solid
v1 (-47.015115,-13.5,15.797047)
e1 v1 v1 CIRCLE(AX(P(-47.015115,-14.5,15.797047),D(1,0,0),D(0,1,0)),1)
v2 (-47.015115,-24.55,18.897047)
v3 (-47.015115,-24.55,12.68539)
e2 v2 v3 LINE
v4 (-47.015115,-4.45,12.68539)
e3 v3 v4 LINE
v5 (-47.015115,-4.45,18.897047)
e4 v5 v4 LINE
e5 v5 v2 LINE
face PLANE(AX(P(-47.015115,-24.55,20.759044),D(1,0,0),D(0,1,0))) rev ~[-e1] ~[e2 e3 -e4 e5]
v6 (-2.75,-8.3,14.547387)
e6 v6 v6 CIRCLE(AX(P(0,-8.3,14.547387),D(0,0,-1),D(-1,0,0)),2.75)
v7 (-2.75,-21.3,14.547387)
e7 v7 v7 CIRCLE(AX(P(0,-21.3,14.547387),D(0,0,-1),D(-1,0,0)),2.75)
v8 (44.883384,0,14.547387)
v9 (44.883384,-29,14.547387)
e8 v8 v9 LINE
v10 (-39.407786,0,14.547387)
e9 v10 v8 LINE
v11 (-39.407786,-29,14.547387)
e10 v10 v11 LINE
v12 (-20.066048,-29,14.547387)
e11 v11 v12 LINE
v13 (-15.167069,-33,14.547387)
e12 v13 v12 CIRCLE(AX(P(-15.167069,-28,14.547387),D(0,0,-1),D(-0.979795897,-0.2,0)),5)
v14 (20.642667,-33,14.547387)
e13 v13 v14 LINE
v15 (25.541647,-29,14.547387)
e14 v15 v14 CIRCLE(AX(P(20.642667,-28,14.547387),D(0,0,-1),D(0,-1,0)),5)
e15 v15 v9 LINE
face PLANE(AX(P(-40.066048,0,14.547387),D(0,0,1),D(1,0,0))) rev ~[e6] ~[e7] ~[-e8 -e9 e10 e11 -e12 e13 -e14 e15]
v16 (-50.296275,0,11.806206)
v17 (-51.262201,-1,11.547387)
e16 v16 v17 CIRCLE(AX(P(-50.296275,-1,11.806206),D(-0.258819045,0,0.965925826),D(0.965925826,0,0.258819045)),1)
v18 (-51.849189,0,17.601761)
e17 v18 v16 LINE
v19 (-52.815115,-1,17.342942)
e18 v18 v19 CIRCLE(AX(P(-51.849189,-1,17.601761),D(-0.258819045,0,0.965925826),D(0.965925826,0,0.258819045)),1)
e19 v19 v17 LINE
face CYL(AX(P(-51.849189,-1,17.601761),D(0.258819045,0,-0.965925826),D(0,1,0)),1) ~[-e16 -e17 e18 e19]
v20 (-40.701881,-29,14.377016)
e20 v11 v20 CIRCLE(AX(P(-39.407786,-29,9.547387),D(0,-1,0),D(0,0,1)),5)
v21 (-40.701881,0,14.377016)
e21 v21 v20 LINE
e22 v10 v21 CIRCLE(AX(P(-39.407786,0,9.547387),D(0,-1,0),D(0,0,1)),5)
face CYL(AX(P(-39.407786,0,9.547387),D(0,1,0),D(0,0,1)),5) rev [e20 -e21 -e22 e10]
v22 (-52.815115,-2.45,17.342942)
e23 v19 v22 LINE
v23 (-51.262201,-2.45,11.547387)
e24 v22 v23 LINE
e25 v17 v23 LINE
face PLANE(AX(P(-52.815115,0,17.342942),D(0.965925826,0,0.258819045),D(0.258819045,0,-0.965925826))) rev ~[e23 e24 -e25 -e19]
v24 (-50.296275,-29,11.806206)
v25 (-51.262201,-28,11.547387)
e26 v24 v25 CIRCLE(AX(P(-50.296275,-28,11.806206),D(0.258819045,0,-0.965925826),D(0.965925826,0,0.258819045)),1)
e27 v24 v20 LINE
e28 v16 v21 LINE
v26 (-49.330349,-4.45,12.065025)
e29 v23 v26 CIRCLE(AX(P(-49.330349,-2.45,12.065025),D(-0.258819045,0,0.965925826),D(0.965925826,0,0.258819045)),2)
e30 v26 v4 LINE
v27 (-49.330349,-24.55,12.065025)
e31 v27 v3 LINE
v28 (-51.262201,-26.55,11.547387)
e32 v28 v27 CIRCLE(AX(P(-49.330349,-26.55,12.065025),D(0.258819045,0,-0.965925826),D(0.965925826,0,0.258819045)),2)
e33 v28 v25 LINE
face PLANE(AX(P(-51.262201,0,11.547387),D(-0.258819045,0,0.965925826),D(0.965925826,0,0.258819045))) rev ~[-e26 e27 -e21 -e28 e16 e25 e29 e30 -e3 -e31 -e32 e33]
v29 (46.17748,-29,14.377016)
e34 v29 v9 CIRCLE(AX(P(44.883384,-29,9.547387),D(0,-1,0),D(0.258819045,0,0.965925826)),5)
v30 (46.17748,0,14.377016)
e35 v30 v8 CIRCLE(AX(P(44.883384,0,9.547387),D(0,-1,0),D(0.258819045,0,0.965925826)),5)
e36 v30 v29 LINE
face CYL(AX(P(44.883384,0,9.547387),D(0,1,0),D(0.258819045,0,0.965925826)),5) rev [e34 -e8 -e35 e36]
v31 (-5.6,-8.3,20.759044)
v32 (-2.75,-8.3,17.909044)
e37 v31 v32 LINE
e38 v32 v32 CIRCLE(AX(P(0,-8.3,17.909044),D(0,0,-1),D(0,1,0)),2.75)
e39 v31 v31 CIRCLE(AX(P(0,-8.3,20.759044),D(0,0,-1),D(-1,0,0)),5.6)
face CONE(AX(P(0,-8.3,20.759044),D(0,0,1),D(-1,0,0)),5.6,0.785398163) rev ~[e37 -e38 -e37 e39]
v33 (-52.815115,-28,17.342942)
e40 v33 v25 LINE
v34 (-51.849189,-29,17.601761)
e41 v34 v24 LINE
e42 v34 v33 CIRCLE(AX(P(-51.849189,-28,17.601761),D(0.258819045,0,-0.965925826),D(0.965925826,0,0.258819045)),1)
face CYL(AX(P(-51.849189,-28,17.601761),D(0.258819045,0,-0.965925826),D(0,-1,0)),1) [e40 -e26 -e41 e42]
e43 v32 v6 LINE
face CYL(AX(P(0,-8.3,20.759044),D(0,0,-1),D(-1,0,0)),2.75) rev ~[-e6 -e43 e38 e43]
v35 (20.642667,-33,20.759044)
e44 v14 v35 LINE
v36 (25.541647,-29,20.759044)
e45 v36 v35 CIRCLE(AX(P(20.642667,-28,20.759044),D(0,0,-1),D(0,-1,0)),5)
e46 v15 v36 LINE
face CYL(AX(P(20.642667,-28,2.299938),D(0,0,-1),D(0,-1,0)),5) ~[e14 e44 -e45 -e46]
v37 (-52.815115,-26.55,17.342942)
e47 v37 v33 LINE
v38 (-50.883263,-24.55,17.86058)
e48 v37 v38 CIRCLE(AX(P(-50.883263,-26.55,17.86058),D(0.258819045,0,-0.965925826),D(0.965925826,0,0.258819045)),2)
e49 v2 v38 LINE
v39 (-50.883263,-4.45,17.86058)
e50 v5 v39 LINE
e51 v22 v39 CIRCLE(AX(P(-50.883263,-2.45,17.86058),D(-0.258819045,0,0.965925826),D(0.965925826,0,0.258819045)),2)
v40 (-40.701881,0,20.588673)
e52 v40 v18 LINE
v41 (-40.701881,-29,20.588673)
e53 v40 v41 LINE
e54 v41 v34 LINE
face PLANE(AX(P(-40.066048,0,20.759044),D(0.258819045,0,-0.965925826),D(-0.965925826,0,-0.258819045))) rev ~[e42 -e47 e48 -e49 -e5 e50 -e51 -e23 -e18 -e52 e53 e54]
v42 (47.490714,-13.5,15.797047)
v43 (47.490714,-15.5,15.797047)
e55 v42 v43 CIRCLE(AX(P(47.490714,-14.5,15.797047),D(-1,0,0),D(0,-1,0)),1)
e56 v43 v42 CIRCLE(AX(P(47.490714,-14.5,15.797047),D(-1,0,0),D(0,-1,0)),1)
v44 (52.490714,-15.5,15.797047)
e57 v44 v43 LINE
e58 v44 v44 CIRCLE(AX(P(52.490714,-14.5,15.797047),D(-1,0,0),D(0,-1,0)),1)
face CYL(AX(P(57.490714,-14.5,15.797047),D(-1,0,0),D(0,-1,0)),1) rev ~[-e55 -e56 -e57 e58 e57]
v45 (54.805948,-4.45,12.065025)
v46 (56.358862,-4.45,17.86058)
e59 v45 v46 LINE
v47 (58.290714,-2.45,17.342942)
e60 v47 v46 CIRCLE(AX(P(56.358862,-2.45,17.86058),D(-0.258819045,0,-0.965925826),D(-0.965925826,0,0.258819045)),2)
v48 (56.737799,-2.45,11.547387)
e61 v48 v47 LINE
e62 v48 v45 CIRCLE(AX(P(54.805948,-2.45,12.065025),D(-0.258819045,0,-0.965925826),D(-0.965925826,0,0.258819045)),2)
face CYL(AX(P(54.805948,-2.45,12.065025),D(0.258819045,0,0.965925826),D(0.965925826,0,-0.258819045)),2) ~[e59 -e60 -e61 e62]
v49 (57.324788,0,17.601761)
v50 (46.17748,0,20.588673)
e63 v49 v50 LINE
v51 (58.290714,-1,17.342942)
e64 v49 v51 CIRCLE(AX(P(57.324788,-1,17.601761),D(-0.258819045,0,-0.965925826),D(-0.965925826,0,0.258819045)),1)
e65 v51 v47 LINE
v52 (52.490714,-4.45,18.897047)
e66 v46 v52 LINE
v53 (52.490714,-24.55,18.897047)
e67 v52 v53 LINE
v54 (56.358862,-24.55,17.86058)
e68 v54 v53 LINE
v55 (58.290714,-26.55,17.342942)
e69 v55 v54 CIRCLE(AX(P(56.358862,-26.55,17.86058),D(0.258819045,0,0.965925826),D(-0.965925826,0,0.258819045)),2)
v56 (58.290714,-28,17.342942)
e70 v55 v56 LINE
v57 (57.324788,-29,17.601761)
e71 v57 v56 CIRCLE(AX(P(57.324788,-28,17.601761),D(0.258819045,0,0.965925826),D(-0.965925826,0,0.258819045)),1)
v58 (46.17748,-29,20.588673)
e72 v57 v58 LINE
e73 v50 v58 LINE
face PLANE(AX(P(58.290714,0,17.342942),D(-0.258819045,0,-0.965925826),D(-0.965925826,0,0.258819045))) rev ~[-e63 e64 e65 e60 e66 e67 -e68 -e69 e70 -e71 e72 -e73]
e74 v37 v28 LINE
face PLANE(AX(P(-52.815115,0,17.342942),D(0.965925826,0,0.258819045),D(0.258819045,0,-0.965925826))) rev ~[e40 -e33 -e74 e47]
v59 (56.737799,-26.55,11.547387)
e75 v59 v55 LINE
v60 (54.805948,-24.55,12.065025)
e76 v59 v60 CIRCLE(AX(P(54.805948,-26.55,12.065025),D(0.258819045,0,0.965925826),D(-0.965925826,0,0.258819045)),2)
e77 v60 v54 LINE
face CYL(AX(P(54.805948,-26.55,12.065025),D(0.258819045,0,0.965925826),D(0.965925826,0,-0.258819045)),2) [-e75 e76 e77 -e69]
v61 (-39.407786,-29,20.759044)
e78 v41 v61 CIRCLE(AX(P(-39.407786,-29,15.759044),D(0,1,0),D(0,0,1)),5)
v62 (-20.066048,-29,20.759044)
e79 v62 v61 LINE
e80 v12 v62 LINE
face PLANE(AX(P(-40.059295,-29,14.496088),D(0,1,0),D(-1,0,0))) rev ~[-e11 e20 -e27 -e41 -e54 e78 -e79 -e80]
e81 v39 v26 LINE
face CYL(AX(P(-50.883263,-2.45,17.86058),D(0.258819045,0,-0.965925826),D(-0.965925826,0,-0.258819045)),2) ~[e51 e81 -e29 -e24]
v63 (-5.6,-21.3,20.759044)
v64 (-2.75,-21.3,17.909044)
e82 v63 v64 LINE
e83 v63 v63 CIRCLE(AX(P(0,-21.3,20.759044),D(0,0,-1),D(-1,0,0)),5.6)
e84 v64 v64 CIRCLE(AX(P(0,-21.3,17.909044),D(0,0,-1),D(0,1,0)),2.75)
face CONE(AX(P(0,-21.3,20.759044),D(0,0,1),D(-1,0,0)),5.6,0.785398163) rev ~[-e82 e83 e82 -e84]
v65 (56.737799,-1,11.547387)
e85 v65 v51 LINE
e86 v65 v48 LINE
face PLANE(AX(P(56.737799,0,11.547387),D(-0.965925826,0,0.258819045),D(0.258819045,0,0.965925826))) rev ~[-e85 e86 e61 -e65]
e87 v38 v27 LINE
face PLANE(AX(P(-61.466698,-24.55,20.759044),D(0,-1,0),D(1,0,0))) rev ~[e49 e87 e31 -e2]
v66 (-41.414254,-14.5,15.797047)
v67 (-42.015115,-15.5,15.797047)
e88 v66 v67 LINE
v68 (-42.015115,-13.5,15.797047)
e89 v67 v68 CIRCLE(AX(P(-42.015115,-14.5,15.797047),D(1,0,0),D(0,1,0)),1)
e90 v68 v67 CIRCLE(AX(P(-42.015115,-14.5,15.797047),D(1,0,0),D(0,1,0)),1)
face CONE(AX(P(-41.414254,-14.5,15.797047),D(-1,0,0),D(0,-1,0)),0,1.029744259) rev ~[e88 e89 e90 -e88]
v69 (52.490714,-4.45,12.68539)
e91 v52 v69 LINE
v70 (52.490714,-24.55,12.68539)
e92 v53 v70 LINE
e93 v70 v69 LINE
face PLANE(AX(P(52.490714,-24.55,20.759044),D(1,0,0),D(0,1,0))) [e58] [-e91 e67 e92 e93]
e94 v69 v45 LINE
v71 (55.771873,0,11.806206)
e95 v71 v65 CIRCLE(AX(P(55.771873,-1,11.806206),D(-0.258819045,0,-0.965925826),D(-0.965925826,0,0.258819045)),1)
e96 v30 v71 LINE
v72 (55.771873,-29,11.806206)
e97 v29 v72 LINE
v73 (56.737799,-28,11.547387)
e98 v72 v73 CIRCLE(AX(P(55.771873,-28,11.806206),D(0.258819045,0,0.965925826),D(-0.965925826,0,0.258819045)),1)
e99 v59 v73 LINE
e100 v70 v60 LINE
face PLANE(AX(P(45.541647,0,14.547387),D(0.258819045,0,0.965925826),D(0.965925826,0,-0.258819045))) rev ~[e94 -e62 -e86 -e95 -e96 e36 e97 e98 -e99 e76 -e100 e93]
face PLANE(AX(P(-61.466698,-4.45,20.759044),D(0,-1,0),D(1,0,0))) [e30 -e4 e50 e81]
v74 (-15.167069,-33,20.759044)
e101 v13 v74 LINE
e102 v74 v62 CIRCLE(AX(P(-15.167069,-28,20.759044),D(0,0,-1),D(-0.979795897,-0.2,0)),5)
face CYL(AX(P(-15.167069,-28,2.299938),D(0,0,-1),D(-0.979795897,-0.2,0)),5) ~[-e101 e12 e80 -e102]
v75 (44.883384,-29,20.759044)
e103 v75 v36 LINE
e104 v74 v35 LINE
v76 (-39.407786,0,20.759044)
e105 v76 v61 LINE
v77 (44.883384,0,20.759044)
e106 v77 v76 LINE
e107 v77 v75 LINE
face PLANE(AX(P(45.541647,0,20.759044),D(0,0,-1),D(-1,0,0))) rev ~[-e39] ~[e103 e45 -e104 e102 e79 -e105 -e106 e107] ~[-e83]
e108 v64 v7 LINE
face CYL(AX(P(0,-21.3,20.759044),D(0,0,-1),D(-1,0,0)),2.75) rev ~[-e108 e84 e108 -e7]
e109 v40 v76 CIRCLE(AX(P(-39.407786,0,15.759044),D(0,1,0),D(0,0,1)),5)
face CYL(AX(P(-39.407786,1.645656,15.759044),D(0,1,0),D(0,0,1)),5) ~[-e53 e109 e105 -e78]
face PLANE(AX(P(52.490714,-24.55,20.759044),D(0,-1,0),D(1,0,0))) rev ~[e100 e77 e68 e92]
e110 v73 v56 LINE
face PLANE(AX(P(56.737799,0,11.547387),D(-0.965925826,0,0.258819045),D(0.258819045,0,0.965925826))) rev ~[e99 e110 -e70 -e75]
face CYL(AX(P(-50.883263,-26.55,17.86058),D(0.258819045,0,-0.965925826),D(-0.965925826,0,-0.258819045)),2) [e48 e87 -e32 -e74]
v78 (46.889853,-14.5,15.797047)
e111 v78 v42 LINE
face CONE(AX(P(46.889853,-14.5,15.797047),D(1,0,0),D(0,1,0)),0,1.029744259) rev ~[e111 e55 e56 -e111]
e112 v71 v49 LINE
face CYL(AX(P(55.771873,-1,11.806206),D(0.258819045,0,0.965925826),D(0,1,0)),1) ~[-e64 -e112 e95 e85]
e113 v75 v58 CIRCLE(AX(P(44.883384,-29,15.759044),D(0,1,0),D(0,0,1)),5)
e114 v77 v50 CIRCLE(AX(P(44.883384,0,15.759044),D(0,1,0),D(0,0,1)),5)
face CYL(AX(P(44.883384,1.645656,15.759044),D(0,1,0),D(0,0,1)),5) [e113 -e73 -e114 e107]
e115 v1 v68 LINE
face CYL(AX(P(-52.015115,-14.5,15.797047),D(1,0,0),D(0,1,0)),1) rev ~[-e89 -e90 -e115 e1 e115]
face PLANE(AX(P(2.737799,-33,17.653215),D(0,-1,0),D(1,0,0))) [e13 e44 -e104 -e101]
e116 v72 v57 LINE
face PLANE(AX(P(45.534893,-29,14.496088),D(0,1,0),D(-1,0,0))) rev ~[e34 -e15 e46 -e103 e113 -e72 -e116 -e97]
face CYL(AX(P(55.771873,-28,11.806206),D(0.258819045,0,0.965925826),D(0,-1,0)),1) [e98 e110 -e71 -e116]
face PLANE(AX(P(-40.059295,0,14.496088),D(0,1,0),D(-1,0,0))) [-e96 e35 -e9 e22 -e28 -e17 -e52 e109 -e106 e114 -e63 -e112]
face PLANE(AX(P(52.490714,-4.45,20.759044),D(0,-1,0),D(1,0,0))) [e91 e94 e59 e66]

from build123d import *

# Parameters (mm, degrees)
F1_DEPTH        = 29
F2_W            = 45.6076951546
F2_H            = 6.2116570825
F3_DEPTH        = 4
F4_W            = 14.4515829202
F4_H            = 20.1
F4_W_2          = 11.8
F5_DEPTH        = 25
F7_D            = 2
F7_DEPTH        = 5
F7_TIP          = 0.600860619
F8_T1_DEPTH     = 29
F8_T3_DEPTH     = 29
F8_T5_DEPTH     = 32.2913124397
F8_T7_DEPTH     = 32.2913124397
F8_T9_DEPTH     = 30.7065545103
F8_T11_DEPTH    = 30.7065545103
F9_R            = 1
F11_D           = 2
F11_DEPTH       = 5
F11_TIP         = 0.600860619
F12_R           = 2
F14_D           = 5.5
F14_CSINK_D     = 11.2
F14_CSINK_ANGLE = 90


# Not quite as in the source:
# - a fillet or chamfer that OpenCascade refuses, or shapes differently, is made with other operations: its cross-section is extruded or revolved along the edge and cut away or added


with BuildPart() as f1:
    # F0 (on Front) → F1 (new body)
    with BuildSketch(Plane.XZ):
        Polygon((45.541646846, 20.7590438725), (-40.0660483086, 20.7590438725), (-52.8151150019, 17.3429417477), (-51.2622007313, 11.54738679), (-40.0660483086, 14.54738679), (45.541646846, 14.54738679), (56.7377992687, 11.54738679), (58.2907135393, 17.3429417477), align=None)
    extrude(amount=F1_DEPTH)

    # F2 (on face) → F3 (join)
    with BuildSketch(Plane.XZ.offset(29)):
        with Locations((2.7377992687, 17.6532153312)):
            Rectangle(F2_W, F2_H)
    extrude(amount=F3_DEPTH)

    # F4 (on face) → F5 (cut)
    with BuildSketch(Plane.XY.offset(20.7590438725)):
        with Locations((-54.240906462, -14.5)):
            Rectangle(F4_W, F4_H)
        with Locations((58.3907135393, -14.5)):
            Rectangle(F4_W_2, F4_H)
    extrude(amount=-F5_DEPTH, mode=Mode.SUBTRACT)

    # F7
    with Locations(Plane(origin=(-47.0151150019, 0, 0), x_dir=(0, -1, 0), z_dir=(-1, 0, 0))):
        with Locations((14.5, 15.7970470638)):
            Hole(F7_D / 2, depth=F7_DEPTH)
            with Locations((0, 0, -(F7_DEPTH + F7_TIP / 2))):  # 118° drill point
                Cone(0, F7_D / 2, F7_TIP, mode=Mode.SUBTRACT)

    # F8: fillet of radius 5 on 6 edges, made by hand

    # F8_s2 → F8_t1 (join)
    with BuildSketch(Plane.XZ):
        with BuildLine():
            ThreePointArc((46.1774795836, 14.3770159214), (45.5360153192, 14.5046110969), (44.8833843581, 14.54738679))
            Line((44.8833843581, 14.54738679), (45.541646846, 14.54738679))
            Line((45.541646846, 14.54738679), (46.1774795836, 14.3770159214))
        make_face()
    extrude(amount=F8_T1_DEPTH)

    # F8_s4 → F8_t3 (join)
    with BuildSketch(Plane.XZ):
        with BuildLine():
            ThreePointArc((-39.4077858206, 14.54738679), (-40.0604167817, 14.5046110969), (-40.7018810462, 14.3770159214))
            Line((-40.7018810462, 14.3770159214), (-40.0660483086, 14.54738679))
            Line((-40.0660483086, 14.54738679), (-39.4077858206, 14.54738679))
        make_face()
    extrude(amount=F8_T3_DEPTH)

    # F8_s6 → F8_t5 (cut)
    with BuildSketch(Plane.XZ.offset(-1.6456562198)):
        with BuildLine():
            ThreePointArc((44.8833843581, 20.7590438725), (45.5360153192, 20.7162681793), (46.1774795836, 20.5886730039))
            Line((46.1774795836, 20.5886730039), (45.541646846, 20.7590438725))
            Line((45.541646846, 20.7590438725), (44.8833843581, 20.7590438725))
        make_face()
    extrude(amount=F8_T5_DEPTH, mode=Mode.SUBTRACT)

    # F8_s8 → F8_t7 (cut)
    with BuildSketch(Plane.XZ.offset(-1.6456562198)):
        with BuildLine():
            ThreePointArc((-39.4077858206, 20.7590438725), (-40.0604167817, 20.7162681793), (-40.7018810462, 20.5886730039))
            Line((-40.7018810462, 20.5886730039), (-40.0660483086, 20.7590438725))
            Line((-40.0660483086, 20.7590438725), (-39.4077858206, 20.7590438725))
        make_face()
    extrude(amount=F8_T7_DEPTH, mode=Mode.SUBTRACT)

    # F8_s10 → F8_t9 (cut)
    with BuildSketch(Plane.XY.offset(2.2999380761)):
        with BuildLine():
            ThreePointArc((20.6426673604, -33), (23.8049450206, -31.8729833462), (25.541646846, -29))
            Line((25.541646846, -29), (25.541646846, -33))
            Line((25.541646846, -33), (20.6426673604, -33))
        make_face()
    extrude(amount=F8_T9_DEPTH, mode=Mode.SUBTRACT)

    # F8_s12 → F8_t11 (cut)
    with BuildSketch(Plane.XY.offset(2.2999380761)):
        with BuildLine():
            ThreePointArc((-20.0660483086, -29), (-18.3293464832, -31.8729833462), (-15.167068823, -33))
            Line((-15.167068823, -33), (-20.0660483086, -33))
            Line((-20.0660483086, -33), (-20.0660483086, -29))
        make_face()
    extrude(amount=F8_T11_DEPTH, mode=Mode.SUBTRACT)

    # F9
    f9_edges = [f1.edges().sort_by_distance(p)[0] for p in [
        (-52.038658, -29, 14.445164),
        (-52.038658, 0, 14.445164),
        (57.514256, 0, 14.445164),
        (57.514256, -29, 14.445164),
    ]]
    fillet(f9_edges, radius=F9_R)

    # F11
    with Locations(Plane.YZ.offset(52.4907135393)):
        with Locations((-14.5, 15.7970470638)):
            Hole(F11_D / 2, depth=F11_DEPTH)
            with Locations((0, 0, -(F11_DEPTH + F11_TIP / 2))):  # 118° drill point
                Cone(0, F11_D / 2, F11_TIP, mode=Mode.SUBTRACT)

    # F12
    f12_edges = [f1.edges().sort_by_distance(p)[0] for p in [
        (-52.038658, -24.55, 14.445164),
        (-52.038658, -4.45, 14.445164),
        (57.514256, -24.55, 14.445164),
        (57.514256, -4.45, 14.445164),
    ]]
    fillet(f12_edges, radius=F12_R)

    # F14 (through all)
    with Locations(Plane.XY.offset(20.7590438725)):
        with Locations((0, -21.3), (0, -8.3)):
            CounterSinkHole(F14_D / 2, F14_CSINK_D / 2, counter_sink_angle=F14_CSINK_ANGLE)


solid = f1.part
